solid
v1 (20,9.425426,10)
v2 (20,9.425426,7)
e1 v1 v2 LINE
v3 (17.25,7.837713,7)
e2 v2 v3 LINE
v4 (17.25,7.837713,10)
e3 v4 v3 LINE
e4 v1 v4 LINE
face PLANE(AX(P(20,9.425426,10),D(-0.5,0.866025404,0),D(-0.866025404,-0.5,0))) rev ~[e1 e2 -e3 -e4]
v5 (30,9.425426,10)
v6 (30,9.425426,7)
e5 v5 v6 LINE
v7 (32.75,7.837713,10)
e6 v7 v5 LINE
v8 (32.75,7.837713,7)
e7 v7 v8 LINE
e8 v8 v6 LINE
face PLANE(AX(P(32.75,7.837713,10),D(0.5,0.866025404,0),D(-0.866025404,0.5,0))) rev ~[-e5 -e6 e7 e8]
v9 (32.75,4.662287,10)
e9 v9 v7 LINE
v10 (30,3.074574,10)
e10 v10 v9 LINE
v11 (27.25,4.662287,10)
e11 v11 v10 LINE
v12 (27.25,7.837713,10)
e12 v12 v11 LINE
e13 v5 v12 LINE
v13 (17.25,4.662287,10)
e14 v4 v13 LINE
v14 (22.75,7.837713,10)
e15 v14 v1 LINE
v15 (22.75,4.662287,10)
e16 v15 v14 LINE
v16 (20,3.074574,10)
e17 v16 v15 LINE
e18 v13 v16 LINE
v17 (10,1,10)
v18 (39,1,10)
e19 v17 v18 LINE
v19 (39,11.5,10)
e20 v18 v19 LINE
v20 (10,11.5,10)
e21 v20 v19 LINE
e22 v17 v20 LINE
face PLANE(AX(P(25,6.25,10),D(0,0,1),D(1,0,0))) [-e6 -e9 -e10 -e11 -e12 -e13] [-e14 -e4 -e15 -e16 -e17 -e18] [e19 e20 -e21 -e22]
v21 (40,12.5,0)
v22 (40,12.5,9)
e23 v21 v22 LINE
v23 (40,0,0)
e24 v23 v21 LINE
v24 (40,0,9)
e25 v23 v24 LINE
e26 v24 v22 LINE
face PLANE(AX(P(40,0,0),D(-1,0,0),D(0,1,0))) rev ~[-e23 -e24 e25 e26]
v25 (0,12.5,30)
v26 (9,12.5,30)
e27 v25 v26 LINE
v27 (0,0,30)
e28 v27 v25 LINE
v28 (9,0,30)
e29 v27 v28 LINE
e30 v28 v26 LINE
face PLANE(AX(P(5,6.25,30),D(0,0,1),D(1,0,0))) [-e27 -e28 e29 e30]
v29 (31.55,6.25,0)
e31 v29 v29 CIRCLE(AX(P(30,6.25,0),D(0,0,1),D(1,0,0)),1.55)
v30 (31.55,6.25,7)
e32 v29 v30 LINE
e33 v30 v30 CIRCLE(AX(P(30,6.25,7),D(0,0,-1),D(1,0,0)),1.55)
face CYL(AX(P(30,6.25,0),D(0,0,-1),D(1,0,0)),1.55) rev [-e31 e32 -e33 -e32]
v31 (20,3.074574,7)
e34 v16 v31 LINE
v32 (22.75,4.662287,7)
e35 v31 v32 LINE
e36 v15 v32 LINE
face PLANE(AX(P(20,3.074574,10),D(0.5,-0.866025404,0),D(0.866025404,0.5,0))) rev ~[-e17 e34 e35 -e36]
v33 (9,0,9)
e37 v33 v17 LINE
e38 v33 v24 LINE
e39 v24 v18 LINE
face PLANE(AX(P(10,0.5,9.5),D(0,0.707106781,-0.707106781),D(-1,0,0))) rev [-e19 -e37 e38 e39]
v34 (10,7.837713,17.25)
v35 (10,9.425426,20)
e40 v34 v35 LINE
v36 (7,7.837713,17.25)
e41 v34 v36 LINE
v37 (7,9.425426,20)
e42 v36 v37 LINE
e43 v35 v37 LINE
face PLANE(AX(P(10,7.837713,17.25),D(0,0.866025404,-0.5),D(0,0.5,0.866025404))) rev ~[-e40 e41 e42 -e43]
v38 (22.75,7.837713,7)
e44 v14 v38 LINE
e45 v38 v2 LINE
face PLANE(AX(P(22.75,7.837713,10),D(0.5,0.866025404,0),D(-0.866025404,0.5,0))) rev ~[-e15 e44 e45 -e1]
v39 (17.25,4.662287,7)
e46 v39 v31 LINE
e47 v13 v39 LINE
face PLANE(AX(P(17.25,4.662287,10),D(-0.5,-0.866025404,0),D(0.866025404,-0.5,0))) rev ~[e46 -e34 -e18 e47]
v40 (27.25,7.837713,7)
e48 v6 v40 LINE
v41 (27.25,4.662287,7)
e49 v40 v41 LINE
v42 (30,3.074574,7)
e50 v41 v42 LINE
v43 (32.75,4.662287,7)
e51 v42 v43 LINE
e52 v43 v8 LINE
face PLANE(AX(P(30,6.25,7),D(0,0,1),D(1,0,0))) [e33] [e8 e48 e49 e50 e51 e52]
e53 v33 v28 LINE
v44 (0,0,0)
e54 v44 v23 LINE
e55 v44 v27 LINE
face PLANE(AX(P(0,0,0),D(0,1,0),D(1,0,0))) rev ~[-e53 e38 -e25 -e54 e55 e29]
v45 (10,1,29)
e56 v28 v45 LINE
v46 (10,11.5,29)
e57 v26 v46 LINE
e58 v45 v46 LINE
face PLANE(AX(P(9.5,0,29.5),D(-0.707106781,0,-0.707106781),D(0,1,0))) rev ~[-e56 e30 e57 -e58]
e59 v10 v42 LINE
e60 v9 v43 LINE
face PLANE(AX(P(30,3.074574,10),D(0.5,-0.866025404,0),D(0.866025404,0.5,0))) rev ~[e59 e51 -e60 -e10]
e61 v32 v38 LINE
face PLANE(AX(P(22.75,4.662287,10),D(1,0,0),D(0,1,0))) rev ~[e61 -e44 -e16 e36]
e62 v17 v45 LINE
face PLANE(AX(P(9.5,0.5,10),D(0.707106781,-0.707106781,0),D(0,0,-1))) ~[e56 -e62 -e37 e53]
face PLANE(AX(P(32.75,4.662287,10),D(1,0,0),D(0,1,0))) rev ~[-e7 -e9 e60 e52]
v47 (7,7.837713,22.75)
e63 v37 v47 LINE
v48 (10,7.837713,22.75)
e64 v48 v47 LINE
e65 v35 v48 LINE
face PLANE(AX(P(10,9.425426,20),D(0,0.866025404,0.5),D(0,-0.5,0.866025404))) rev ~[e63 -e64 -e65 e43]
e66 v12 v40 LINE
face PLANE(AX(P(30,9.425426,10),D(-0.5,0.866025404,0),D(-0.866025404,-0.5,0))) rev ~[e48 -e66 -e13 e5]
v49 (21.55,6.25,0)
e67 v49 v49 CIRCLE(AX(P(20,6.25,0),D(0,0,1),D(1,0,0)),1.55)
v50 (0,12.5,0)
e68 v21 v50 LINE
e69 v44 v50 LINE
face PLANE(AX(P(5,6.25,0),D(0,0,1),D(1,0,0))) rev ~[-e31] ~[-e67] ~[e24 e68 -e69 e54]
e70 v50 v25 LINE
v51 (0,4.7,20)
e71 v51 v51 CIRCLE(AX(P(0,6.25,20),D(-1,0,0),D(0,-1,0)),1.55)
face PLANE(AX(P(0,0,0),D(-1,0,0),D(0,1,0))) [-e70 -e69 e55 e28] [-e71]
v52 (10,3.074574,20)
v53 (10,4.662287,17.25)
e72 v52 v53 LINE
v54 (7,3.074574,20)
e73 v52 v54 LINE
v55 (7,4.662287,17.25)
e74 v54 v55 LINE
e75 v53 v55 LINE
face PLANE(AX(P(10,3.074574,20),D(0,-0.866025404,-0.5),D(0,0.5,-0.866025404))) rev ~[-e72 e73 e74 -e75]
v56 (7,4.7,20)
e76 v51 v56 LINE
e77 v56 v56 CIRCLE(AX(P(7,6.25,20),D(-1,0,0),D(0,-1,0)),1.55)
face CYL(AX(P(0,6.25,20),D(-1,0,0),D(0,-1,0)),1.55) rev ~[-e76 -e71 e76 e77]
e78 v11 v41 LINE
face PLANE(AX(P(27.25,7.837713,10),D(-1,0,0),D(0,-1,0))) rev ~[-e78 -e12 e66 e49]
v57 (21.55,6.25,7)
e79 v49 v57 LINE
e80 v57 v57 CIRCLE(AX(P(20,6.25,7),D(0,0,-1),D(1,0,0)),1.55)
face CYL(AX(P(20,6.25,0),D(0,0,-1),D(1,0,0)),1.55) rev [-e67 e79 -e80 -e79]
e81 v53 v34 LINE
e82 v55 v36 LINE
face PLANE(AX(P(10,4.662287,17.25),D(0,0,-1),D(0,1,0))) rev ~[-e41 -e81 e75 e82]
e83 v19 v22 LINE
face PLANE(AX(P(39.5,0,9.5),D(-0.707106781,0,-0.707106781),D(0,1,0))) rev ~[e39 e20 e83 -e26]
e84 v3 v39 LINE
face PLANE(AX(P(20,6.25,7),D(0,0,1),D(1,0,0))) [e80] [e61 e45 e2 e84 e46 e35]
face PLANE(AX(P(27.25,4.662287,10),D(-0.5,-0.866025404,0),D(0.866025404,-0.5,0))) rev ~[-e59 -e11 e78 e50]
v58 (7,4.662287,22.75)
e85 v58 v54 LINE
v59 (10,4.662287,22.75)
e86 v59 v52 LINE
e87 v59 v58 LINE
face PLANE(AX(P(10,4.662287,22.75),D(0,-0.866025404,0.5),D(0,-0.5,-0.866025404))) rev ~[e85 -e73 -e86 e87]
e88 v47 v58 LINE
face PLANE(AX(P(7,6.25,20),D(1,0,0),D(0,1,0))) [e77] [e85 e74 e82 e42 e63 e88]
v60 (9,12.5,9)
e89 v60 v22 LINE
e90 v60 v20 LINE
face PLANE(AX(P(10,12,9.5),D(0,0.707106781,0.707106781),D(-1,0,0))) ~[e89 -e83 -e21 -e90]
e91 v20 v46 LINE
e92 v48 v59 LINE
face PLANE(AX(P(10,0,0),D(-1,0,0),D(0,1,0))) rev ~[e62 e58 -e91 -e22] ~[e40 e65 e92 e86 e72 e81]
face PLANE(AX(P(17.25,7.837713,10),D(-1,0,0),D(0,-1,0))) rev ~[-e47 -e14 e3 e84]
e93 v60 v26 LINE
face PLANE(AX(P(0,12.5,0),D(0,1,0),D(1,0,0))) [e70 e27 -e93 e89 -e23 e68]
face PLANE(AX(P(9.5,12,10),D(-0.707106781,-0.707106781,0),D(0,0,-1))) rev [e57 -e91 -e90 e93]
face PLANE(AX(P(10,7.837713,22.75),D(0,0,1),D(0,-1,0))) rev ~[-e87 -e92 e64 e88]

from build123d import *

# Parameters (mm, degrees)
F0_W     = 30
F0_H     = 12.5
F0_R     = 1.55
F1_DEPTH = 10
F0_W_2   = 10
F2_DEPTH = 30
F3_R     = 1.55
F4_DEPTH = 10
F5_SIZE  = 1
F7_DEPTH = 3
F9_DEPTH = 3


# Not quite as in the source:
# - a feature names something its author has since deleted; it is built from what else it names


with BuildPart() as f1:
    # F0 (on Top) → F1 (new body)
    with BuildSketch(Plane.XY):
        with Locations((25, 6.25)):
            Rectangle(F0_W, F0_H)
        with Locations((20, 6.25)):
            Circle(F0_R, mode=Mode.SUBTRACT)
        with Locations((30, 6.25)):
            Circle(F0_R, mode=Mode.SUBTRACT)
    extrude(amount=F1_DEPTH)

    # F0 (on Top) → F2 (join)
    with BuildSketch(Plane.XY):
        with Locations((5, 6.25)):
            Rectangle(F0_W_2, F0_H)
    extrude(amount=F2_DEPTH)

    # F3 (on face) → F4 (cut)
    with BuildSketch(Plane(origin=(0, 0, 0), x_dir=(0, -1, 0), z_dir=(-1, 0, 0))):
        with Locations((-6.25, 20)):
            Circle(F3_R)
    extrude(amount=-F4_DEPTH, mode=Mode.SUBTRACT)

    # F5
    f5_edges = [f1.edges().sort_by_distance(p)[0] for p in [
        (25, 0, 10),
        (40, 6.25, 10),
        (25, 12.5, 10),
        (10, 12.5, 20),
        (10, 6.25, 30),
        (10, 0, 20),
    ]]
    chamfer(f5_edges, length=F5_SIZE)

    # F6 (on face) → F7 (cut)
    with BuildSketch(Plane.XY.offset(10)):
        Polygon((22.75, 4.6622867597), (22.75, 7.8377132403), (20, 9.4254264805), (17.25, 7.8377132403), (17.25, 4.6622867597), (20, 3.0745735195), align=None)
        Polygon((32.75, 4.6622867597), (32.75, 7.8377132403), (30, 9.4254264805), (27.25, 7.8377132403), (27.25, 4.6622867597), (30, 3.0745735195), align=None)
    extrude(amount=-F7_DEPTH, mode=Mode.SUBTRACT)

    # F8 (on face) → F9 (cut)
    with BuildSketch(Plane.YZ.offset(10)):
        Polygon((4.6622867597, 17.25), (7.8377132403, 17.25), (9.4254264805, 20), (7.8377132403, 22.75), (4.6622867597, 22.75), (3.0745735195, 20), align=None)
    extrude(amount=-F9_DEPTH, mode=Mode.SUBTRACT)


solid = f1.part
